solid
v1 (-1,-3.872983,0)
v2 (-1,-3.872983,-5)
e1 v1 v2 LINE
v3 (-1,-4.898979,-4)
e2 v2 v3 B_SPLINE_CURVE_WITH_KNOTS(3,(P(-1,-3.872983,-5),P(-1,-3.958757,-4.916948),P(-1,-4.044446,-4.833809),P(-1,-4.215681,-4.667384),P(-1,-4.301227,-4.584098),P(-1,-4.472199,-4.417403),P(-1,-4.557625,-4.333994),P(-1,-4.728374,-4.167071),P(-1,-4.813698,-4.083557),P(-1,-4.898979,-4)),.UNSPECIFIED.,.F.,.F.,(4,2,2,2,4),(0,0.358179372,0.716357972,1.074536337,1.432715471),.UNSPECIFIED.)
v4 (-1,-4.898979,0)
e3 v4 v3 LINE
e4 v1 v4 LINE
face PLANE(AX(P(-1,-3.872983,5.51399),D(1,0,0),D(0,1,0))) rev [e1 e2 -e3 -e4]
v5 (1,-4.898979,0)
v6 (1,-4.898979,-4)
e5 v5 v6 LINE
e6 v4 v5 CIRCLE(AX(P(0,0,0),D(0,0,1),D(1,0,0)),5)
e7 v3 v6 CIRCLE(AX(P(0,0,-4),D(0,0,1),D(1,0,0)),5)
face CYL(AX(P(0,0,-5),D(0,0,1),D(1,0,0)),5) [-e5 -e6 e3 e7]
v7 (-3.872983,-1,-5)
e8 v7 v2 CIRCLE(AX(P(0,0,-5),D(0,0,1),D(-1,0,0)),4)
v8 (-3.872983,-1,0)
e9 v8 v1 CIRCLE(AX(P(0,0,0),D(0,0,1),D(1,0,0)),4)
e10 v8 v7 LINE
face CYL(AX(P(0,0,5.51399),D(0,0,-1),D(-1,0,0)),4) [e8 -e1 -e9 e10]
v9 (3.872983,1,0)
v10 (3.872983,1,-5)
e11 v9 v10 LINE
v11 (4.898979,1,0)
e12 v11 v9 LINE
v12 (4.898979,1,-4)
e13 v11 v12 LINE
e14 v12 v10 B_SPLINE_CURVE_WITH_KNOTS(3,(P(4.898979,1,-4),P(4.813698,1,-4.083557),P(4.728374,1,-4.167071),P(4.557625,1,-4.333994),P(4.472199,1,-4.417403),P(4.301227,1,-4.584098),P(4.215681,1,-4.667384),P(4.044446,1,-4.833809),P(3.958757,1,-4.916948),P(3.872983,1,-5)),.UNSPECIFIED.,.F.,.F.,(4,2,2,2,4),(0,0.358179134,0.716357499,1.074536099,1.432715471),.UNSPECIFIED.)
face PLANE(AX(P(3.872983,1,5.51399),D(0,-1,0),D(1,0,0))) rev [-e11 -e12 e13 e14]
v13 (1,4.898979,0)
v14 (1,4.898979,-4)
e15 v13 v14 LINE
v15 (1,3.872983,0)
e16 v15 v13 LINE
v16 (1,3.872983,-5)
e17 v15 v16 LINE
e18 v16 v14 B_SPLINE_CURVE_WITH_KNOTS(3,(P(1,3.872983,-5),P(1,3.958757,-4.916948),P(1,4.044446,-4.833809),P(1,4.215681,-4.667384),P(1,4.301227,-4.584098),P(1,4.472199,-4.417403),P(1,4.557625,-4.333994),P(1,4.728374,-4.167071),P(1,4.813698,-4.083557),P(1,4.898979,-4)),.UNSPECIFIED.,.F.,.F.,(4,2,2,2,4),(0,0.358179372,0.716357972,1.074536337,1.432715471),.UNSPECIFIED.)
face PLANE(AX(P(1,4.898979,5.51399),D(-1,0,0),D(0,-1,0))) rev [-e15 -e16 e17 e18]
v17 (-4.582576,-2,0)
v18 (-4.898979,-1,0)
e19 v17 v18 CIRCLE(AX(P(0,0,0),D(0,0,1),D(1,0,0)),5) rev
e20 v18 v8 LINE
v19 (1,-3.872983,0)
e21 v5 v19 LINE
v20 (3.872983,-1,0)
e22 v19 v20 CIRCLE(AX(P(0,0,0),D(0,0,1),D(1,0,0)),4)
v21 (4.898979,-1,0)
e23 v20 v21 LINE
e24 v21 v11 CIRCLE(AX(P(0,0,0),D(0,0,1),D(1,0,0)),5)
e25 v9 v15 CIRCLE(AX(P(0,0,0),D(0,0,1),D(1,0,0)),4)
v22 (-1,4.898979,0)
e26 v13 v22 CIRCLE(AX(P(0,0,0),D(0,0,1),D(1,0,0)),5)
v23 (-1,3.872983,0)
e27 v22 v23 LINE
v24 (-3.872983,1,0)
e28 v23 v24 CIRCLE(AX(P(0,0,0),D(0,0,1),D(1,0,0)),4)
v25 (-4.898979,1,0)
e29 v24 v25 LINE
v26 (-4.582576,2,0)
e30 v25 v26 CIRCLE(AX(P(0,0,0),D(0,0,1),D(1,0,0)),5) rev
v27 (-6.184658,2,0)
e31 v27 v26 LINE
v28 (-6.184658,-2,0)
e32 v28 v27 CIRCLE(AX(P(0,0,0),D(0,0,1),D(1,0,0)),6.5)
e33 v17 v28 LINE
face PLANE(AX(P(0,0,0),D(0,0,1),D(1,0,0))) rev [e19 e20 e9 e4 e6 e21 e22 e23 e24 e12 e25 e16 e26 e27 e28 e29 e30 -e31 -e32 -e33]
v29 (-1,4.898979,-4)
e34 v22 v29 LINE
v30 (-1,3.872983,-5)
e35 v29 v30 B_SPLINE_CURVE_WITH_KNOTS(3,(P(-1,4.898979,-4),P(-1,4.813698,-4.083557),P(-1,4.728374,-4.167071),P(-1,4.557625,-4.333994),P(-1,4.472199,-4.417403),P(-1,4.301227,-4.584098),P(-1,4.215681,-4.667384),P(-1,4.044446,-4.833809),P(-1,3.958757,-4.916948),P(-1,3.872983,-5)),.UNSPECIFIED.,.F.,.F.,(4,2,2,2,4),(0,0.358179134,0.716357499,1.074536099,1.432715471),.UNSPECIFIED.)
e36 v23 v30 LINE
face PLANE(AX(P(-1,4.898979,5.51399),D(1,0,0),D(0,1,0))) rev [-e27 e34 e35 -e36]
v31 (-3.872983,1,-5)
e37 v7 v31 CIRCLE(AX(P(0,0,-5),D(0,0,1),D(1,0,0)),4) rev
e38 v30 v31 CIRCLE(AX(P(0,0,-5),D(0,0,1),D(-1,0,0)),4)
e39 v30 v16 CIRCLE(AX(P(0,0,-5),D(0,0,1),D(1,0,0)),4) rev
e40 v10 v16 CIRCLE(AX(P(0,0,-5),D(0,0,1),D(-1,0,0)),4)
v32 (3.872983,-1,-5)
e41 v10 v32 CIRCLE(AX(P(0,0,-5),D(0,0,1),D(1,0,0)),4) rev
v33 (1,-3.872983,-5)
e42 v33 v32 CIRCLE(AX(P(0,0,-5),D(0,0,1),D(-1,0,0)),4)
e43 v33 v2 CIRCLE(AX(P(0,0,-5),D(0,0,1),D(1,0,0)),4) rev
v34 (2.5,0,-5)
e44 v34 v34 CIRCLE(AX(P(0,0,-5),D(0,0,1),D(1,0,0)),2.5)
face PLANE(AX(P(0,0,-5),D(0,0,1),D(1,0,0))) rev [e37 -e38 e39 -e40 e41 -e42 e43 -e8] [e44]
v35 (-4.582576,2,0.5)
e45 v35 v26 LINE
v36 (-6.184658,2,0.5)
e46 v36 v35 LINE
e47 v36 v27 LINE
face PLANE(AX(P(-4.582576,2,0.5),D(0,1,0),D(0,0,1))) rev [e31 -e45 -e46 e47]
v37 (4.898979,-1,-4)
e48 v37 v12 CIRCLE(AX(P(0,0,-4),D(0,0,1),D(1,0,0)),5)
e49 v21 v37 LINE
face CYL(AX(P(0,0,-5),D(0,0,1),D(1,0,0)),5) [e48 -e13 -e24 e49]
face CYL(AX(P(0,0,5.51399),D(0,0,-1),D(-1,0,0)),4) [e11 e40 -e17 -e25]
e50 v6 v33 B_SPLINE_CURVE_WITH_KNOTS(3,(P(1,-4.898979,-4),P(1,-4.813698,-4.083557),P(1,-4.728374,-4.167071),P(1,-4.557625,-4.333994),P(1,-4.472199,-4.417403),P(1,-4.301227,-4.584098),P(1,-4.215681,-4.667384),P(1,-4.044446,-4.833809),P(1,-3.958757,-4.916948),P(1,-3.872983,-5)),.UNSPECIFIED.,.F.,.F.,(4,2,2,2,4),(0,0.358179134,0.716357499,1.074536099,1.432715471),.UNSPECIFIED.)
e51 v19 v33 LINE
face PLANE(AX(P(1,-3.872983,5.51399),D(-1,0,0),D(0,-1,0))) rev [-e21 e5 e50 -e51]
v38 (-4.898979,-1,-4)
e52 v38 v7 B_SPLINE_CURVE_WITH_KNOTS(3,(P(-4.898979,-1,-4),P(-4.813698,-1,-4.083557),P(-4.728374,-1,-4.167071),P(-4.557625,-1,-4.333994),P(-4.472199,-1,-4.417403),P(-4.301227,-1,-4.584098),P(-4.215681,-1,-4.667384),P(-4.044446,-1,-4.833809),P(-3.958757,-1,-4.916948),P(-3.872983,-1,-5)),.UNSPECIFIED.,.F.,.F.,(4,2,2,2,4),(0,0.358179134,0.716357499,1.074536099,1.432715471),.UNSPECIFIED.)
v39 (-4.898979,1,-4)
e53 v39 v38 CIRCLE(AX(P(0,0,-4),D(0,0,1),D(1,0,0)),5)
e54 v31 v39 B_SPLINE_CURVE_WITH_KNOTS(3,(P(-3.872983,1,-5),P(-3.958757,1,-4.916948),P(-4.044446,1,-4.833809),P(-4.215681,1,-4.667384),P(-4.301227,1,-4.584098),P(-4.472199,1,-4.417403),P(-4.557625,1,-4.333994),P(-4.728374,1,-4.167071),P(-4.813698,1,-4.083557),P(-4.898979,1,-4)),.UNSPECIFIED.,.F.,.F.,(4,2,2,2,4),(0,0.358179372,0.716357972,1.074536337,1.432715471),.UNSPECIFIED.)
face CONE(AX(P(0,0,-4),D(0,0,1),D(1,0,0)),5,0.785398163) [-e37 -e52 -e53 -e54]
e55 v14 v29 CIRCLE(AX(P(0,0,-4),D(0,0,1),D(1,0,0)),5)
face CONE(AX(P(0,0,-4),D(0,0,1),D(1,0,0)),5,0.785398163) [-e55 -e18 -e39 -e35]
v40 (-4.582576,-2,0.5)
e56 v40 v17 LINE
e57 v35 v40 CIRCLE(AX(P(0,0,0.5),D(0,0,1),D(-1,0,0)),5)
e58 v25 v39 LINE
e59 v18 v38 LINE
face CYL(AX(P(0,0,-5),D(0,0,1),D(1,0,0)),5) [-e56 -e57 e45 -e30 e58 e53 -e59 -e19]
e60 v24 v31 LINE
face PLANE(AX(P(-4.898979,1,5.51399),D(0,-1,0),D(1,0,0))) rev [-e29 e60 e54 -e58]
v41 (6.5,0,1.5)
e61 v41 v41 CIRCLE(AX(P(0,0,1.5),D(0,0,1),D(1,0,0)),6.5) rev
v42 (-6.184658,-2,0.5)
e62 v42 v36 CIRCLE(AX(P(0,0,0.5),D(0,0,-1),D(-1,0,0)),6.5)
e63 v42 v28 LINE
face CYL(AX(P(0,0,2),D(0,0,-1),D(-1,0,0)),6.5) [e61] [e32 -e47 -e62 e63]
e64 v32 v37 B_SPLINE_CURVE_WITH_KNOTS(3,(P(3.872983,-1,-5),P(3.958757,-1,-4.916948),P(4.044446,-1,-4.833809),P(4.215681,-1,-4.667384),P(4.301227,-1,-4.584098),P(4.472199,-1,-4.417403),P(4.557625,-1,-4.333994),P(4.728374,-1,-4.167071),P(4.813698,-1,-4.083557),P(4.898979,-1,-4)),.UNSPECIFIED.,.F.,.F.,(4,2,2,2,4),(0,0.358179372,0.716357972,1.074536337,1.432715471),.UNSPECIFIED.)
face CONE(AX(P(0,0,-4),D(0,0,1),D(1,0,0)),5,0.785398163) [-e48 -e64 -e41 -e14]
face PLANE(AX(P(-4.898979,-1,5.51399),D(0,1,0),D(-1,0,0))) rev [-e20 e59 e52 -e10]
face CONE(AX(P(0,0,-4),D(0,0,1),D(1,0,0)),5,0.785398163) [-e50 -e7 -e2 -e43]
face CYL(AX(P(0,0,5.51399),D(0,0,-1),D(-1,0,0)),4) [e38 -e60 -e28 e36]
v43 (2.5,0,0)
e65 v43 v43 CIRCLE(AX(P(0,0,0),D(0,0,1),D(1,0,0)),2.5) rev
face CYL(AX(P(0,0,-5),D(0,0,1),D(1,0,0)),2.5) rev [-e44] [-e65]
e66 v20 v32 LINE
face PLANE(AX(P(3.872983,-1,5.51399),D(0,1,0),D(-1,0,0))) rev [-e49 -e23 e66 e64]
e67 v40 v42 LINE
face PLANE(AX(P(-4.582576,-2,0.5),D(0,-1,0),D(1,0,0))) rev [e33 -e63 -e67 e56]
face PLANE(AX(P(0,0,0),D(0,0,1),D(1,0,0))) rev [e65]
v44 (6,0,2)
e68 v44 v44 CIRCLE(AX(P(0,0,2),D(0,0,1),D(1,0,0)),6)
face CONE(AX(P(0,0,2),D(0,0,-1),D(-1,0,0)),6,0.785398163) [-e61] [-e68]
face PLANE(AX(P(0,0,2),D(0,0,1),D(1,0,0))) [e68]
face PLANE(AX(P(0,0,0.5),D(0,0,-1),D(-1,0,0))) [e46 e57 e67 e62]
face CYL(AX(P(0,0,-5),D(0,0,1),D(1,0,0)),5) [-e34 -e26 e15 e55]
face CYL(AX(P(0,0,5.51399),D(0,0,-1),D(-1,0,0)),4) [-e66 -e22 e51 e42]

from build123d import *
from build123d.topology import SkipClean

# Parameters (mm, degrees)
SKETCH1_R           = 5
SKETCH1_R_2         = 2.5
BOSS_EXTRUDE1_DEPTH = 5
SKETCH2_R           = 6.5
BOSS_EXTRUDE2_DEPTH = 2
CHAMFER1_SIZE       = 0.5
CUT_EXTRUDE1_DEPTH  = 0.5
CUT_EXTRUDE2_DEPTH  = 5


with BuildPart() as part:
    # Sketch1 → Boss-Extrude1 (new body)
    with BuildSketch(Plane.XY):
        Circle(SKETCH1_R)
        Circle(SKETCH1_R_2, mode=Mode.SUBTRACT)
    extrude(amount=-BOSS_EXTRUDE1_DEPTH)

    # Sketch2 → Boss-Extrude2 (add)
    with BuildSketch(Plane.XY):
        Circle(SKETCH2_R)
    extrude(amount=BOSS_EXTRUDE2_DEPTH)

    # Chamfer1
    chamfer1_edges = [part.edges().sort_by_distance(p)[0] for p in [
        (-6.5, 0, 2),
    ]]
    chamfer(chamfer1_edges, length=CHAMFER1_SIZE)

    # Sketch3 → Cut-Extrude1 (cut)
    with SkipClean():  # the faces are left unmerged after this step: merging them gives an invalid solid
        with BuildSketch(Plane(origin=(0, 0, 0), x_dir=(-1, 0, 0), z_dir=(0, 0, -1))):
            with BuildLine():
                Line((4.582575695, 2), (6.184658438, 2))
                ThreePointArc((6.184658438, 2), (6.5, 0), (6.184658438, -2))
                Line((6.184658438, -2), (4.582575695, -2))
                ThreePointArc((4.582575695, -2), (5, 0), (4.582575695, 2))
            make_face()
        extrude(amount=-CUT_EXTRUDE1_DEPTH, mode=Mode.SUBTRACT)

    # Sketch4 → Cut-Extrude2 (cut)
    with SkipClean():  # the faces are left unmerged after this step: merging them gives an invalid solid
        with BuildSketch(Plane(origin=(0, 0, -5), x_dir=(-1, 0, 0), z_dir=(0, 0, -1))):
            with BuildLine():
                Line((-1, 4.898979486), (-1, 3.872983346))
                ThreePointArc((-1, 3.872983346), (-2.828427125, 2.828427125), (-3.872983346, 1))
                Line((-3.872983346, 1), (-4.898979486, 1))
                ThreePointArc((-4.898979486, 1), (-3.535533906, 3.535533906), (-1, 4.898979486))
            make_face()
            with BuildLine():
                Line((1, 4.898979486), (1, 3.872983346))
                ThreePointArc((1, 3.872983346), (2.828427125, 2.828427125), (3.872983346, 1))
                Line((3.872983346, 1), (4.898979486, 1))
                ThreePointArc((4.898979486, 1), (3.535533906, 3.535533906), (1, 4.898979486))
            make_face()
            with BuildLine():
                Line((4.898979486, -1), (3.872983346, -1))
                ThreePointArc((3.872983346, -1), (2.828427125, -2.828427125), (1, -3.872983346))
                Line((1, -3.872983346), (1, -4.898979486))
                ThreePointArc((1, -4.898979486), (3.535533906, -3.535533906), (4.898979486, -1))
            make_face()
            with BuildLine():
                Line((-3.872983346, -1), (-4.898979486, -1))
                ThreePointArc((-4.898979486, -1), (-3.535533906, -3.535533906), (-1, -4.898979486))
                Line((-1, -4.898979486), (-1, -3.872983346))
                ThreePointArc((-1, -3.872983346), (-2.828427125, -2.828427125), (-3.872983346, -1))
            make_face()
        extrude(amount=-CUT_EXTRUDE2_DEPTH, mode=Mode.SUBTRACT)

    # Chamfer2: read off the stored shape, not the designer's step
    # Chamfer2 outline → Chamfer2 (revolve, cut)
    with SkipClean():  # the faces are left unmerged after this step: merging them gives an invalid solid
        with BuildSketch(Plane.XZ):
            Polygon((5, -4), (4, -5), (5, -5), align=None)
        revolve(axis=Axis((0, 0, 0), (0, 0, 1)), mode=Mode.SUBTRACT)


solid = part.part
